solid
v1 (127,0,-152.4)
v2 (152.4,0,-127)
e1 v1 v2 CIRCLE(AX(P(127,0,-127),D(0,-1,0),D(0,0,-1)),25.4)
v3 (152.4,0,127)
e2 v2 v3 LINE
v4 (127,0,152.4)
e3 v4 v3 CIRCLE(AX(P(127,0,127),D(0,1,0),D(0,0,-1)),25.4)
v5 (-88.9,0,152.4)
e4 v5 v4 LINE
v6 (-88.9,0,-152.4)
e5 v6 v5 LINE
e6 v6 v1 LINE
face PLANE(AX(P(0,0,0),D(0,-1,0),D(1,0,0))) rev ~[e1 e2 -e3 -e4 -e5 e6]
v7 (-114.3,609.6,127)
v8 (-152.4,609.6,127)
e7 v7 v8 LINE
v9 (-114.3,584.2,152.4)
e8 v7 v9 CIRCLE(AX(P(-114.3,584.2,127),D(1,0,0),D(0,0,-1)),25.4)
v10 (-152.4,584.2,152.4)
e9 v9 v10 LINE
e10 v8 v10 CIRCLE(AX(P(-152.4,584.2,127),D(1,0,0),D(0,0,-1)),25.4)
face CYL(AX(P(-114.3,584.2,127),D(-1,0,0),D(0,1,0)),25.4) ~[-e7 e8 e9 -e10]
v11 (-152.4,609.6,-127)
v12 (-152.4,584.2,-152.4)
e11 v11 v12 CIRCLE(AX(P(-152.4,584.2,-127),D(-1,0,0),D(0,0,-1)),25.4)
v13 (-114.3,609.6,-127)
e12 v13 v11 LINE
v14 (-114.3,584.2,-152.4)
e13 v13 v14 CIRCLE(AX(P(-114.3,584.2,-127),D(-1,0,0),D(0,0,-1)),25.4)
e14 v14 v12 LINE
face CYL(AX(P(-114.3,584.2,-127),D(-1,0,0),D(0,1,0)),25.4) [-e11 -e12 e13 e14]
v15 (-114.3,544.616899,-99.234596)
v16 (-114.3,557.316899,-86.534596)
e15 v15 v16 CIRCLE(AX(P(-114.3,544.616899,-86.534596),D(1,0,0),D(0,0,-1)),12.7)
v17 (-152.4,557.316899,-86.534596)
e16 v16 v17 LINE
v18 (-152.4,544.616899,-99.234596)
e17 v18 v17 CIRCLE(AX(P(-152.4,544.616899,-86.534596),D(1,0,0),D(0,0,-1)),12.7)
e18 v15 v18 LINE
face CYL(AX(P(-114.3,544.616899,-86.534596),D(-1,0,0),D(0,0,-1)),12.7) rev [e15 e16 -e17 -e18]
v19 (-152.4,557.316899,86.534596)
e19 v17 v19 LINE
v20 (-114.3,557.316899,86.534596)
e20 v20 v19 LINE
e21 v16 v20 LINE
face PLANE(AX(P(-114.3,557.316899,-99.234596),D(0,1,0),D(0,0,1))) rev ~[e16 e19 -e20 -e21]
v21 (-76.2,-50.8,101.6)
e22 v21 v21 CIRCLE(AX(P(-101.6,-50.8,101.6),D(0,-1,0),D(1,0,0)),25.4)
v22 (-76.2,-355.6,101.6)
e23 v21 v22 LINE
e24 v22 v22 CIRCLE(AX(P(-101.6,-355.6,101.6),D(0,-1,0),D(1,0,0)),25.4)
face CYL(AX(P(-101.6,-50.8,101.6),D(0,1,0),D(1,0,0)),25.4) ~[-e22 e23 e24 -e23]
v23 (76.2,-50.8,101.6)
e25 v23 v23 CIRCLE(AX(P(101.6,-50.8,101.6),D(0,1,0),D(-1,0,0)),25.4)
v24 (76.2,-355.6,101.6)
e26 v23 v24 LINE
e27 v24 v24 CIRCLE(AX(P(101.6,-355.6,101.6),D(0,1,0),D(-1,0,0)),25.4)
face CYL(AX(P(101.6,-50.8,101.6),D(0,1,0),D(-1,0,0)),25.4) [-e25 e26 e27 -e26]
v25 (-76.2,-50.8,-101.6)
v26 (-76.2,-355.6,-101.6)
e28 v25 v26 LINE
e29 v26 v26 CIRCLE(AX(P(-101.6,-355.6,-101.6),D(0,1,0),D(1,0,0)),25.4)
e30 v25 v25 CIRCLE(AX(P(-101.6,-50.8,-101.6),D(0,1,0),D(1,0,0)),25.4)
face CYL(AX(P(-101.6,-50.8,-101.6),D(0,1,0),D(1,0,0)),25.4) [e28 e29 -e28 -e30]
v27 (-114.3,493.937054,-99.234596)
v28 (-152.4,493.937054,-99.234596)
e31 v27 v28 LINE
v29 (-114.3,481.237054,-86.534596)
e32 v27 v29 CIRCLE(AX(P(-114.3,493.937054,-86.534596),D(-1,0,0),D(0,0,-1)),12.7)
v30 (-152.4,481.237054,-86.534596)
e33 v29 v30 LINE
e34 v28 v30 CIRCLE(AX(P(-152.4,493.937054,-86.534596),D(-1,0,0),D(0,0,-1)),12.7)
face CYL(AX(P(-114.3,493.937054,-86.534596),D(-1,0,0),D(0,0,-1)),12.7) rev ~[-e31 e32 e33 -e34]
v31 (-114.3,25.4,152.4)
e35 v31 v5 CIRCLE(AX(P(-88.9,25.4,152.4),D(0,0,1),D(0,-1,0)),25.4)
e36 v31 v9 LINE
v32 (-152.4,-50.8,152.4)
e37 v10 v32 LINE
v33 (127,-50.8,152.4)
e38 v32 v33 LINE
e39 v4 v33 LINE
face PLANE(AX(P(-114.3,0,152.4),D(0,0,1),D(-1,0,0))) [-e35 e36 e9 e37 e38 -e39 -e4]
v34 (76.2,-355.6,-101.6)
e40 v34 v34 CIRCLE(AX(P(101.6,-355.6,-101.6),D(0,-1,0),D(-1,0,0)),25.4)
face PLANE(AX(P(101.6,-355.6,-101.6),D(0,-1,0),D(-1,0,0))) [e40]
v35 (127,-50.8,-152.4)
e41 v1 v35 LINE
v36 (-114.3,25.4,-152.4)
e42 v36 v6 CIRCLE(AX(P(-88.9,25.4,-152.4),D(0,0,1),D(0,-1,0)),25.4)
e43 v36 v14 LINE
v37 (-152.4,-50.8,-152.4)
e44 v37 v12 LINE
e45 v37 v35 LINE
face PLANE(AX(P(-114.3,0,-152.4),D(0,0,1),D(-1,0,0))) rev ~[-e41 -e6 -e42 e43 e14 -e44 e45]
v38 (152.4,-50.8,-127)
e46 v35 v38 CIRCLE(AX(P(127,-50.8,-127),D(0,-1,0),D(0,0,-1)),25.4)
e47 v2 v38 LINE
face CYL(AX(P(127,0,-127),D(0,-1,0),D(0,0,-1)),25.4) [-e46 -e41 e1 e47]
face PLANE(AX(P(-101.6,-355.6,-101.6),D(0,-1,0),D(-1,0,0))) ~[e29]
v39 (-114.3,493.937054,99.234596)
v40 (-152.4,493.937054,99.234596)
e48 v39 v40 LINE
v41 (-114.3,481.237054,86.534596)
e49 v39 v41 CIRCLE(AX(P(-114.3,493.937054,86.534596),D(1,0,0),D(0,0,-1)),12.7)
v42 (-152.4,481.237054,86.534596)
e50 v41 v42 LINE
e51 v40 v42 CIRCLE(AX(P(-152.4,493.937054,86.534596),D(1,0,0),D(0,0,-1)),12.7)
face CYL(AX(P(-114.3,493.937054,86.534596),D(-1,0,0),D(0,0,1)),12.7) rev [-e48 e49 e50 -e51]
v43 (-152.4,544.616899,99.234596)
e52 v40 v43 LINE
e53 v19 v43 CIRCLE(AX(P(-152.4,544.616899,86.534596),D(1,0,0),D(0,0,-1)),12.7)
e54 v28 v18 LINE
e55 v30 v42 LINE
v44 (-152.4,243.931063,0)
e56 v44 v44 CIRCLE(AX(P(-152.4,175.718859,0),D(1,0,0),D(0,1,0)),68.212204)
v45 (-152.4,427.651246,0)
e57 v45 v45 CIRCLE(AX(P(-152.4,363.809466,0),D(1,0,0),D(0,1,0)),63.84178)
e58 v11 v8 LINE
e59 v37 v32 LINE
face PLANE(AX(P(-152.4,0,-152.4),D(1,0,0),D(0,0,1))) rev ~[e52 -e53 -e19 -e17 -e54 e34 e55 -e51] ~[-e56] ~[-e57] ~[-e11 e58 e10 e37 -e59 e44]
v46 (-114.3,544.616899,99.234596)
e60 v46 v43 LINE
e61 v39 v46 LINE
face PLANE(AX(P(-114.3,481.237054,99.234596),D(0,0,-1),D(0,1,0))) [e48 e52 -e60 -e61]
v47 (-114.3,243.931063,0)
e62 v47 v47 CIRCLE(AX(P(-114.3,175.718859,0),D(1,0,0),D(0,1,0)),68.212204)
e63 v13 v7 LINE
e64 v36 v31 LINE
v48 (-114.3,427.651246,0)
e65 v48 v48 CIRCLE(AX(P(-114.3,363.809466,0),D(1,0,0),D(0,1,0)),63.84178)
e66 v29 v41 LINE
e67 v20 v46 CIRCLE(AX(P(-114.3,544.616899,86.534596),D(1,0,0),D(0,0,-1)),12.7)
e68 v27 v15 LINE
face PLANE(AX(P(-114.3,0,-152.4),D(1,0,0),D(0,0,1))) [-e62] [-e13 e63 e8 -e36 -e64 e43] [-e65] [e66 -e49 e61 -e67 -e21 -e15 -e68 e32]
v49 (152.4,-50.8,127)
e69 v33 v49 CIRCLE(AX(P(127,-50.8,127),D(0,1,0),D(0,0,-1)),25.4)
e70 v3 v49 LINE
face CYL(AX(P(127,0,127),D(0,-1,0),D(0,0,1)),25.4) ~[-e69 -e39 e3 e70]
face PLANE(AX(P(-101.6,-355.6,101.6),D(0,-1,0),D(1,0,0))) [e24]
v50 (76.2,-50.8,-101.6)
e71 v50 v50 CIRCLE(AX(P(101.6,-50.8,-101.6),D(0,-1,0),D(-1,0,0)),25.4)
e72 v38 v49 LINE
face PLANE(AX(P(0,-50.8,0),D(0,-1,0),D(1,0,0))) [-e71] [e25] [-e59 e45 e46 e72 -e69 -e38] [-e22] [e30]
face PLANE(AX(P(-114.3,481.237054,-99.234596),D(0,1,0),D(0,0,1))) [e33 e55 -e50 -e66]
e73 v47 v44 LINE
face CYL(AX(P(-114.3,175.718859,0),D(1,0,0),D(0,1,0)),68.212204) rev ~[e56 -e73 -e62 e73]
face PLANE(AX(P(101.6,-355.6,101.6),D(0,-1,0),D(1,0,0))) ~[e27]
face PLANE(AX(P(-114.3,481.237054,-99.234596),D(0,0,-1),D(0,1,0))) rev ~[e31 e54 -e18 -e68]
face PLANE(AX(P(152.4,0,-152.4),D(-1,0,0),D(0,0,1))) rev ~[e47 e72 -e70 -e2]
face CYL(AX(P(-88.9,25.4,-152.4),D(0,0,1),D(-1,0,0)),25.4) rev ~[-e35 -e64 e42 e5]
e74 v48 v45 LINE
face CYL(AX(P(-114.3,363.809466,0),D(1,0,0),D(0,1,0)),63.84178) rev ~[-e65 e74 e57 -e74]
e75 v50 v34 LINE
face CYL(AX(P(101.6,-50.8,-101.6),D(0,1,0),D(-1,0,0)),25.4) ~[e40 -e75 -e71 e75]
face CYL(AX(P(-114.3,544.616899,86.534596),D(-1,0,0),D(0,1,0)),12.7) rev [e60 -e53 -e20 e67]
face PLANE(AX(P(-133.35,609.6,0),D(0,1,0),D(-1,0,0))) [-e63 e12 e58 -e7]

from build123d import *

# Parameters (mm, degrees)
F0_W      = 304.8
F0_H      = 304.8
F1_DEPTH  = 50.8
F2_R      = 25.4
F3_DEPTH  = 304.8
F6_W      = 38.1
F6_H      = 304.8
F7_DEPTH  = 609.6
F8_R      = 25.4
F9_R      = 25.4
F10_R     = 25.4
F11_R     = 68.2122039911
F12_DEPTH = 38.1
F13_R     = 63.8417796902
F14_DEPTH = 38.1
F15_W     = 76.0798454285
F15_H     = 198.4691917896
F16_DEPTH = 38.1
F17_R     = 12.7


with BuildPart() as f1:
    # F0 (on Front) → F1 (new body)
    with BuildSketch(Plane.XZ):
        Rectangle(F0_W, F0_H)
    extrude(amount=F1_DEPTH)

    # F2 (on face) → F3 (join)
    with BuildSketch(Plane.XZ.offset(50.8)):
        with Locations((-101.6, 101.6)):
            Circle(F2_R)
    extrude(amount=F3_DEPTH)


with BuildPart() as f4_1:
    # F4: instance of F1
    add(f1.part.mirror(Plane.XY))


with BuildPart() as f1_1:
    add(f1.part)

    add(f4_1.part)  # F5 merges F4_1
    # F5: F1, F4_1 across plane
    add(f1.part.mirror(Plane.YZ))
    add(f4_1.part.mirror(Plane.YZ))

    # F6 (on face) → F7 (join)
    with BuildSketch(Plane(origin=(0, 0, 0), x_dir=(-1, 0, 0), z_dir=(0, 1, 0))):
        with Locations((133.35, 0)):
            Rectangle(F6_W, F6_H)
    extrude(amount=F7_DEPTH)

    # F8
    f8_edges = [f1_1.edges().sort_by_distance(p)[0] for p in [
        (-133.35, 609.6, 152.4),
        (-133.35, 609.6, -152.4),
    ]]
    fillet(f8_edges, radius=F8_R)

    # F9
    f9_edges = [f1_1.edges().sort_by_distance(p)[0] for p in [
        (-114.3, 0, 0),
        (152.4, -25.4, 152.4),
    ]]
    fillet(f9_edges, radius=F9_R)

    # F10
    f10_edges = [f1_1.edges().sort_by_distance(p)[0] for p in [
        (152.4, -25.4, -152.4),
    ]]
    fillet(f10_edges, radius=F10_R)

    # F11 (on face) → F12 (cut, through all)
    with BuildSketch(Plane.YZ.offset(-114.3)):
        with Locations((175.7188588381, 0)):
            Circle(F11_R)
    extrude(amount=-F12_DEPTH, mode=Mode.SUBTRACT)

    # F13 (on face) → F14 (cut, through all)
    with BuildSketch(Plane.YZ.offset(-114.3)):
        with Locations((363.809466362, 0)):
            Circle(F13_R)
    extrude(amount=-F14_DEPTH, mode=Mode.SUBTRACT)

    # F15 (on face) → F16 (cut, through all)
    with BuildSketch(Plane.YZ.offset(-114.3)):
        with Locations((519.2769765854, 0)):
            Rectangle(F15_W, F15_H)
    extrude(amount=-F16_DEPTH, mode=Mode.SUBTRACT)

    # F17
    f17_edges = [f1_1.edges().sort_by_distance(p)[0] for p in [
        (-133.35, 557.316899, -99.234596),
        (-133.35, 557.316899, 99.234596),
        (-133.35, 481.237054, 99.234596),
        (-133.35, 481.237054, -99.234596),
    ]]
    fillet(f17_edges, radius=F17_R)


solid = f1_1.part
